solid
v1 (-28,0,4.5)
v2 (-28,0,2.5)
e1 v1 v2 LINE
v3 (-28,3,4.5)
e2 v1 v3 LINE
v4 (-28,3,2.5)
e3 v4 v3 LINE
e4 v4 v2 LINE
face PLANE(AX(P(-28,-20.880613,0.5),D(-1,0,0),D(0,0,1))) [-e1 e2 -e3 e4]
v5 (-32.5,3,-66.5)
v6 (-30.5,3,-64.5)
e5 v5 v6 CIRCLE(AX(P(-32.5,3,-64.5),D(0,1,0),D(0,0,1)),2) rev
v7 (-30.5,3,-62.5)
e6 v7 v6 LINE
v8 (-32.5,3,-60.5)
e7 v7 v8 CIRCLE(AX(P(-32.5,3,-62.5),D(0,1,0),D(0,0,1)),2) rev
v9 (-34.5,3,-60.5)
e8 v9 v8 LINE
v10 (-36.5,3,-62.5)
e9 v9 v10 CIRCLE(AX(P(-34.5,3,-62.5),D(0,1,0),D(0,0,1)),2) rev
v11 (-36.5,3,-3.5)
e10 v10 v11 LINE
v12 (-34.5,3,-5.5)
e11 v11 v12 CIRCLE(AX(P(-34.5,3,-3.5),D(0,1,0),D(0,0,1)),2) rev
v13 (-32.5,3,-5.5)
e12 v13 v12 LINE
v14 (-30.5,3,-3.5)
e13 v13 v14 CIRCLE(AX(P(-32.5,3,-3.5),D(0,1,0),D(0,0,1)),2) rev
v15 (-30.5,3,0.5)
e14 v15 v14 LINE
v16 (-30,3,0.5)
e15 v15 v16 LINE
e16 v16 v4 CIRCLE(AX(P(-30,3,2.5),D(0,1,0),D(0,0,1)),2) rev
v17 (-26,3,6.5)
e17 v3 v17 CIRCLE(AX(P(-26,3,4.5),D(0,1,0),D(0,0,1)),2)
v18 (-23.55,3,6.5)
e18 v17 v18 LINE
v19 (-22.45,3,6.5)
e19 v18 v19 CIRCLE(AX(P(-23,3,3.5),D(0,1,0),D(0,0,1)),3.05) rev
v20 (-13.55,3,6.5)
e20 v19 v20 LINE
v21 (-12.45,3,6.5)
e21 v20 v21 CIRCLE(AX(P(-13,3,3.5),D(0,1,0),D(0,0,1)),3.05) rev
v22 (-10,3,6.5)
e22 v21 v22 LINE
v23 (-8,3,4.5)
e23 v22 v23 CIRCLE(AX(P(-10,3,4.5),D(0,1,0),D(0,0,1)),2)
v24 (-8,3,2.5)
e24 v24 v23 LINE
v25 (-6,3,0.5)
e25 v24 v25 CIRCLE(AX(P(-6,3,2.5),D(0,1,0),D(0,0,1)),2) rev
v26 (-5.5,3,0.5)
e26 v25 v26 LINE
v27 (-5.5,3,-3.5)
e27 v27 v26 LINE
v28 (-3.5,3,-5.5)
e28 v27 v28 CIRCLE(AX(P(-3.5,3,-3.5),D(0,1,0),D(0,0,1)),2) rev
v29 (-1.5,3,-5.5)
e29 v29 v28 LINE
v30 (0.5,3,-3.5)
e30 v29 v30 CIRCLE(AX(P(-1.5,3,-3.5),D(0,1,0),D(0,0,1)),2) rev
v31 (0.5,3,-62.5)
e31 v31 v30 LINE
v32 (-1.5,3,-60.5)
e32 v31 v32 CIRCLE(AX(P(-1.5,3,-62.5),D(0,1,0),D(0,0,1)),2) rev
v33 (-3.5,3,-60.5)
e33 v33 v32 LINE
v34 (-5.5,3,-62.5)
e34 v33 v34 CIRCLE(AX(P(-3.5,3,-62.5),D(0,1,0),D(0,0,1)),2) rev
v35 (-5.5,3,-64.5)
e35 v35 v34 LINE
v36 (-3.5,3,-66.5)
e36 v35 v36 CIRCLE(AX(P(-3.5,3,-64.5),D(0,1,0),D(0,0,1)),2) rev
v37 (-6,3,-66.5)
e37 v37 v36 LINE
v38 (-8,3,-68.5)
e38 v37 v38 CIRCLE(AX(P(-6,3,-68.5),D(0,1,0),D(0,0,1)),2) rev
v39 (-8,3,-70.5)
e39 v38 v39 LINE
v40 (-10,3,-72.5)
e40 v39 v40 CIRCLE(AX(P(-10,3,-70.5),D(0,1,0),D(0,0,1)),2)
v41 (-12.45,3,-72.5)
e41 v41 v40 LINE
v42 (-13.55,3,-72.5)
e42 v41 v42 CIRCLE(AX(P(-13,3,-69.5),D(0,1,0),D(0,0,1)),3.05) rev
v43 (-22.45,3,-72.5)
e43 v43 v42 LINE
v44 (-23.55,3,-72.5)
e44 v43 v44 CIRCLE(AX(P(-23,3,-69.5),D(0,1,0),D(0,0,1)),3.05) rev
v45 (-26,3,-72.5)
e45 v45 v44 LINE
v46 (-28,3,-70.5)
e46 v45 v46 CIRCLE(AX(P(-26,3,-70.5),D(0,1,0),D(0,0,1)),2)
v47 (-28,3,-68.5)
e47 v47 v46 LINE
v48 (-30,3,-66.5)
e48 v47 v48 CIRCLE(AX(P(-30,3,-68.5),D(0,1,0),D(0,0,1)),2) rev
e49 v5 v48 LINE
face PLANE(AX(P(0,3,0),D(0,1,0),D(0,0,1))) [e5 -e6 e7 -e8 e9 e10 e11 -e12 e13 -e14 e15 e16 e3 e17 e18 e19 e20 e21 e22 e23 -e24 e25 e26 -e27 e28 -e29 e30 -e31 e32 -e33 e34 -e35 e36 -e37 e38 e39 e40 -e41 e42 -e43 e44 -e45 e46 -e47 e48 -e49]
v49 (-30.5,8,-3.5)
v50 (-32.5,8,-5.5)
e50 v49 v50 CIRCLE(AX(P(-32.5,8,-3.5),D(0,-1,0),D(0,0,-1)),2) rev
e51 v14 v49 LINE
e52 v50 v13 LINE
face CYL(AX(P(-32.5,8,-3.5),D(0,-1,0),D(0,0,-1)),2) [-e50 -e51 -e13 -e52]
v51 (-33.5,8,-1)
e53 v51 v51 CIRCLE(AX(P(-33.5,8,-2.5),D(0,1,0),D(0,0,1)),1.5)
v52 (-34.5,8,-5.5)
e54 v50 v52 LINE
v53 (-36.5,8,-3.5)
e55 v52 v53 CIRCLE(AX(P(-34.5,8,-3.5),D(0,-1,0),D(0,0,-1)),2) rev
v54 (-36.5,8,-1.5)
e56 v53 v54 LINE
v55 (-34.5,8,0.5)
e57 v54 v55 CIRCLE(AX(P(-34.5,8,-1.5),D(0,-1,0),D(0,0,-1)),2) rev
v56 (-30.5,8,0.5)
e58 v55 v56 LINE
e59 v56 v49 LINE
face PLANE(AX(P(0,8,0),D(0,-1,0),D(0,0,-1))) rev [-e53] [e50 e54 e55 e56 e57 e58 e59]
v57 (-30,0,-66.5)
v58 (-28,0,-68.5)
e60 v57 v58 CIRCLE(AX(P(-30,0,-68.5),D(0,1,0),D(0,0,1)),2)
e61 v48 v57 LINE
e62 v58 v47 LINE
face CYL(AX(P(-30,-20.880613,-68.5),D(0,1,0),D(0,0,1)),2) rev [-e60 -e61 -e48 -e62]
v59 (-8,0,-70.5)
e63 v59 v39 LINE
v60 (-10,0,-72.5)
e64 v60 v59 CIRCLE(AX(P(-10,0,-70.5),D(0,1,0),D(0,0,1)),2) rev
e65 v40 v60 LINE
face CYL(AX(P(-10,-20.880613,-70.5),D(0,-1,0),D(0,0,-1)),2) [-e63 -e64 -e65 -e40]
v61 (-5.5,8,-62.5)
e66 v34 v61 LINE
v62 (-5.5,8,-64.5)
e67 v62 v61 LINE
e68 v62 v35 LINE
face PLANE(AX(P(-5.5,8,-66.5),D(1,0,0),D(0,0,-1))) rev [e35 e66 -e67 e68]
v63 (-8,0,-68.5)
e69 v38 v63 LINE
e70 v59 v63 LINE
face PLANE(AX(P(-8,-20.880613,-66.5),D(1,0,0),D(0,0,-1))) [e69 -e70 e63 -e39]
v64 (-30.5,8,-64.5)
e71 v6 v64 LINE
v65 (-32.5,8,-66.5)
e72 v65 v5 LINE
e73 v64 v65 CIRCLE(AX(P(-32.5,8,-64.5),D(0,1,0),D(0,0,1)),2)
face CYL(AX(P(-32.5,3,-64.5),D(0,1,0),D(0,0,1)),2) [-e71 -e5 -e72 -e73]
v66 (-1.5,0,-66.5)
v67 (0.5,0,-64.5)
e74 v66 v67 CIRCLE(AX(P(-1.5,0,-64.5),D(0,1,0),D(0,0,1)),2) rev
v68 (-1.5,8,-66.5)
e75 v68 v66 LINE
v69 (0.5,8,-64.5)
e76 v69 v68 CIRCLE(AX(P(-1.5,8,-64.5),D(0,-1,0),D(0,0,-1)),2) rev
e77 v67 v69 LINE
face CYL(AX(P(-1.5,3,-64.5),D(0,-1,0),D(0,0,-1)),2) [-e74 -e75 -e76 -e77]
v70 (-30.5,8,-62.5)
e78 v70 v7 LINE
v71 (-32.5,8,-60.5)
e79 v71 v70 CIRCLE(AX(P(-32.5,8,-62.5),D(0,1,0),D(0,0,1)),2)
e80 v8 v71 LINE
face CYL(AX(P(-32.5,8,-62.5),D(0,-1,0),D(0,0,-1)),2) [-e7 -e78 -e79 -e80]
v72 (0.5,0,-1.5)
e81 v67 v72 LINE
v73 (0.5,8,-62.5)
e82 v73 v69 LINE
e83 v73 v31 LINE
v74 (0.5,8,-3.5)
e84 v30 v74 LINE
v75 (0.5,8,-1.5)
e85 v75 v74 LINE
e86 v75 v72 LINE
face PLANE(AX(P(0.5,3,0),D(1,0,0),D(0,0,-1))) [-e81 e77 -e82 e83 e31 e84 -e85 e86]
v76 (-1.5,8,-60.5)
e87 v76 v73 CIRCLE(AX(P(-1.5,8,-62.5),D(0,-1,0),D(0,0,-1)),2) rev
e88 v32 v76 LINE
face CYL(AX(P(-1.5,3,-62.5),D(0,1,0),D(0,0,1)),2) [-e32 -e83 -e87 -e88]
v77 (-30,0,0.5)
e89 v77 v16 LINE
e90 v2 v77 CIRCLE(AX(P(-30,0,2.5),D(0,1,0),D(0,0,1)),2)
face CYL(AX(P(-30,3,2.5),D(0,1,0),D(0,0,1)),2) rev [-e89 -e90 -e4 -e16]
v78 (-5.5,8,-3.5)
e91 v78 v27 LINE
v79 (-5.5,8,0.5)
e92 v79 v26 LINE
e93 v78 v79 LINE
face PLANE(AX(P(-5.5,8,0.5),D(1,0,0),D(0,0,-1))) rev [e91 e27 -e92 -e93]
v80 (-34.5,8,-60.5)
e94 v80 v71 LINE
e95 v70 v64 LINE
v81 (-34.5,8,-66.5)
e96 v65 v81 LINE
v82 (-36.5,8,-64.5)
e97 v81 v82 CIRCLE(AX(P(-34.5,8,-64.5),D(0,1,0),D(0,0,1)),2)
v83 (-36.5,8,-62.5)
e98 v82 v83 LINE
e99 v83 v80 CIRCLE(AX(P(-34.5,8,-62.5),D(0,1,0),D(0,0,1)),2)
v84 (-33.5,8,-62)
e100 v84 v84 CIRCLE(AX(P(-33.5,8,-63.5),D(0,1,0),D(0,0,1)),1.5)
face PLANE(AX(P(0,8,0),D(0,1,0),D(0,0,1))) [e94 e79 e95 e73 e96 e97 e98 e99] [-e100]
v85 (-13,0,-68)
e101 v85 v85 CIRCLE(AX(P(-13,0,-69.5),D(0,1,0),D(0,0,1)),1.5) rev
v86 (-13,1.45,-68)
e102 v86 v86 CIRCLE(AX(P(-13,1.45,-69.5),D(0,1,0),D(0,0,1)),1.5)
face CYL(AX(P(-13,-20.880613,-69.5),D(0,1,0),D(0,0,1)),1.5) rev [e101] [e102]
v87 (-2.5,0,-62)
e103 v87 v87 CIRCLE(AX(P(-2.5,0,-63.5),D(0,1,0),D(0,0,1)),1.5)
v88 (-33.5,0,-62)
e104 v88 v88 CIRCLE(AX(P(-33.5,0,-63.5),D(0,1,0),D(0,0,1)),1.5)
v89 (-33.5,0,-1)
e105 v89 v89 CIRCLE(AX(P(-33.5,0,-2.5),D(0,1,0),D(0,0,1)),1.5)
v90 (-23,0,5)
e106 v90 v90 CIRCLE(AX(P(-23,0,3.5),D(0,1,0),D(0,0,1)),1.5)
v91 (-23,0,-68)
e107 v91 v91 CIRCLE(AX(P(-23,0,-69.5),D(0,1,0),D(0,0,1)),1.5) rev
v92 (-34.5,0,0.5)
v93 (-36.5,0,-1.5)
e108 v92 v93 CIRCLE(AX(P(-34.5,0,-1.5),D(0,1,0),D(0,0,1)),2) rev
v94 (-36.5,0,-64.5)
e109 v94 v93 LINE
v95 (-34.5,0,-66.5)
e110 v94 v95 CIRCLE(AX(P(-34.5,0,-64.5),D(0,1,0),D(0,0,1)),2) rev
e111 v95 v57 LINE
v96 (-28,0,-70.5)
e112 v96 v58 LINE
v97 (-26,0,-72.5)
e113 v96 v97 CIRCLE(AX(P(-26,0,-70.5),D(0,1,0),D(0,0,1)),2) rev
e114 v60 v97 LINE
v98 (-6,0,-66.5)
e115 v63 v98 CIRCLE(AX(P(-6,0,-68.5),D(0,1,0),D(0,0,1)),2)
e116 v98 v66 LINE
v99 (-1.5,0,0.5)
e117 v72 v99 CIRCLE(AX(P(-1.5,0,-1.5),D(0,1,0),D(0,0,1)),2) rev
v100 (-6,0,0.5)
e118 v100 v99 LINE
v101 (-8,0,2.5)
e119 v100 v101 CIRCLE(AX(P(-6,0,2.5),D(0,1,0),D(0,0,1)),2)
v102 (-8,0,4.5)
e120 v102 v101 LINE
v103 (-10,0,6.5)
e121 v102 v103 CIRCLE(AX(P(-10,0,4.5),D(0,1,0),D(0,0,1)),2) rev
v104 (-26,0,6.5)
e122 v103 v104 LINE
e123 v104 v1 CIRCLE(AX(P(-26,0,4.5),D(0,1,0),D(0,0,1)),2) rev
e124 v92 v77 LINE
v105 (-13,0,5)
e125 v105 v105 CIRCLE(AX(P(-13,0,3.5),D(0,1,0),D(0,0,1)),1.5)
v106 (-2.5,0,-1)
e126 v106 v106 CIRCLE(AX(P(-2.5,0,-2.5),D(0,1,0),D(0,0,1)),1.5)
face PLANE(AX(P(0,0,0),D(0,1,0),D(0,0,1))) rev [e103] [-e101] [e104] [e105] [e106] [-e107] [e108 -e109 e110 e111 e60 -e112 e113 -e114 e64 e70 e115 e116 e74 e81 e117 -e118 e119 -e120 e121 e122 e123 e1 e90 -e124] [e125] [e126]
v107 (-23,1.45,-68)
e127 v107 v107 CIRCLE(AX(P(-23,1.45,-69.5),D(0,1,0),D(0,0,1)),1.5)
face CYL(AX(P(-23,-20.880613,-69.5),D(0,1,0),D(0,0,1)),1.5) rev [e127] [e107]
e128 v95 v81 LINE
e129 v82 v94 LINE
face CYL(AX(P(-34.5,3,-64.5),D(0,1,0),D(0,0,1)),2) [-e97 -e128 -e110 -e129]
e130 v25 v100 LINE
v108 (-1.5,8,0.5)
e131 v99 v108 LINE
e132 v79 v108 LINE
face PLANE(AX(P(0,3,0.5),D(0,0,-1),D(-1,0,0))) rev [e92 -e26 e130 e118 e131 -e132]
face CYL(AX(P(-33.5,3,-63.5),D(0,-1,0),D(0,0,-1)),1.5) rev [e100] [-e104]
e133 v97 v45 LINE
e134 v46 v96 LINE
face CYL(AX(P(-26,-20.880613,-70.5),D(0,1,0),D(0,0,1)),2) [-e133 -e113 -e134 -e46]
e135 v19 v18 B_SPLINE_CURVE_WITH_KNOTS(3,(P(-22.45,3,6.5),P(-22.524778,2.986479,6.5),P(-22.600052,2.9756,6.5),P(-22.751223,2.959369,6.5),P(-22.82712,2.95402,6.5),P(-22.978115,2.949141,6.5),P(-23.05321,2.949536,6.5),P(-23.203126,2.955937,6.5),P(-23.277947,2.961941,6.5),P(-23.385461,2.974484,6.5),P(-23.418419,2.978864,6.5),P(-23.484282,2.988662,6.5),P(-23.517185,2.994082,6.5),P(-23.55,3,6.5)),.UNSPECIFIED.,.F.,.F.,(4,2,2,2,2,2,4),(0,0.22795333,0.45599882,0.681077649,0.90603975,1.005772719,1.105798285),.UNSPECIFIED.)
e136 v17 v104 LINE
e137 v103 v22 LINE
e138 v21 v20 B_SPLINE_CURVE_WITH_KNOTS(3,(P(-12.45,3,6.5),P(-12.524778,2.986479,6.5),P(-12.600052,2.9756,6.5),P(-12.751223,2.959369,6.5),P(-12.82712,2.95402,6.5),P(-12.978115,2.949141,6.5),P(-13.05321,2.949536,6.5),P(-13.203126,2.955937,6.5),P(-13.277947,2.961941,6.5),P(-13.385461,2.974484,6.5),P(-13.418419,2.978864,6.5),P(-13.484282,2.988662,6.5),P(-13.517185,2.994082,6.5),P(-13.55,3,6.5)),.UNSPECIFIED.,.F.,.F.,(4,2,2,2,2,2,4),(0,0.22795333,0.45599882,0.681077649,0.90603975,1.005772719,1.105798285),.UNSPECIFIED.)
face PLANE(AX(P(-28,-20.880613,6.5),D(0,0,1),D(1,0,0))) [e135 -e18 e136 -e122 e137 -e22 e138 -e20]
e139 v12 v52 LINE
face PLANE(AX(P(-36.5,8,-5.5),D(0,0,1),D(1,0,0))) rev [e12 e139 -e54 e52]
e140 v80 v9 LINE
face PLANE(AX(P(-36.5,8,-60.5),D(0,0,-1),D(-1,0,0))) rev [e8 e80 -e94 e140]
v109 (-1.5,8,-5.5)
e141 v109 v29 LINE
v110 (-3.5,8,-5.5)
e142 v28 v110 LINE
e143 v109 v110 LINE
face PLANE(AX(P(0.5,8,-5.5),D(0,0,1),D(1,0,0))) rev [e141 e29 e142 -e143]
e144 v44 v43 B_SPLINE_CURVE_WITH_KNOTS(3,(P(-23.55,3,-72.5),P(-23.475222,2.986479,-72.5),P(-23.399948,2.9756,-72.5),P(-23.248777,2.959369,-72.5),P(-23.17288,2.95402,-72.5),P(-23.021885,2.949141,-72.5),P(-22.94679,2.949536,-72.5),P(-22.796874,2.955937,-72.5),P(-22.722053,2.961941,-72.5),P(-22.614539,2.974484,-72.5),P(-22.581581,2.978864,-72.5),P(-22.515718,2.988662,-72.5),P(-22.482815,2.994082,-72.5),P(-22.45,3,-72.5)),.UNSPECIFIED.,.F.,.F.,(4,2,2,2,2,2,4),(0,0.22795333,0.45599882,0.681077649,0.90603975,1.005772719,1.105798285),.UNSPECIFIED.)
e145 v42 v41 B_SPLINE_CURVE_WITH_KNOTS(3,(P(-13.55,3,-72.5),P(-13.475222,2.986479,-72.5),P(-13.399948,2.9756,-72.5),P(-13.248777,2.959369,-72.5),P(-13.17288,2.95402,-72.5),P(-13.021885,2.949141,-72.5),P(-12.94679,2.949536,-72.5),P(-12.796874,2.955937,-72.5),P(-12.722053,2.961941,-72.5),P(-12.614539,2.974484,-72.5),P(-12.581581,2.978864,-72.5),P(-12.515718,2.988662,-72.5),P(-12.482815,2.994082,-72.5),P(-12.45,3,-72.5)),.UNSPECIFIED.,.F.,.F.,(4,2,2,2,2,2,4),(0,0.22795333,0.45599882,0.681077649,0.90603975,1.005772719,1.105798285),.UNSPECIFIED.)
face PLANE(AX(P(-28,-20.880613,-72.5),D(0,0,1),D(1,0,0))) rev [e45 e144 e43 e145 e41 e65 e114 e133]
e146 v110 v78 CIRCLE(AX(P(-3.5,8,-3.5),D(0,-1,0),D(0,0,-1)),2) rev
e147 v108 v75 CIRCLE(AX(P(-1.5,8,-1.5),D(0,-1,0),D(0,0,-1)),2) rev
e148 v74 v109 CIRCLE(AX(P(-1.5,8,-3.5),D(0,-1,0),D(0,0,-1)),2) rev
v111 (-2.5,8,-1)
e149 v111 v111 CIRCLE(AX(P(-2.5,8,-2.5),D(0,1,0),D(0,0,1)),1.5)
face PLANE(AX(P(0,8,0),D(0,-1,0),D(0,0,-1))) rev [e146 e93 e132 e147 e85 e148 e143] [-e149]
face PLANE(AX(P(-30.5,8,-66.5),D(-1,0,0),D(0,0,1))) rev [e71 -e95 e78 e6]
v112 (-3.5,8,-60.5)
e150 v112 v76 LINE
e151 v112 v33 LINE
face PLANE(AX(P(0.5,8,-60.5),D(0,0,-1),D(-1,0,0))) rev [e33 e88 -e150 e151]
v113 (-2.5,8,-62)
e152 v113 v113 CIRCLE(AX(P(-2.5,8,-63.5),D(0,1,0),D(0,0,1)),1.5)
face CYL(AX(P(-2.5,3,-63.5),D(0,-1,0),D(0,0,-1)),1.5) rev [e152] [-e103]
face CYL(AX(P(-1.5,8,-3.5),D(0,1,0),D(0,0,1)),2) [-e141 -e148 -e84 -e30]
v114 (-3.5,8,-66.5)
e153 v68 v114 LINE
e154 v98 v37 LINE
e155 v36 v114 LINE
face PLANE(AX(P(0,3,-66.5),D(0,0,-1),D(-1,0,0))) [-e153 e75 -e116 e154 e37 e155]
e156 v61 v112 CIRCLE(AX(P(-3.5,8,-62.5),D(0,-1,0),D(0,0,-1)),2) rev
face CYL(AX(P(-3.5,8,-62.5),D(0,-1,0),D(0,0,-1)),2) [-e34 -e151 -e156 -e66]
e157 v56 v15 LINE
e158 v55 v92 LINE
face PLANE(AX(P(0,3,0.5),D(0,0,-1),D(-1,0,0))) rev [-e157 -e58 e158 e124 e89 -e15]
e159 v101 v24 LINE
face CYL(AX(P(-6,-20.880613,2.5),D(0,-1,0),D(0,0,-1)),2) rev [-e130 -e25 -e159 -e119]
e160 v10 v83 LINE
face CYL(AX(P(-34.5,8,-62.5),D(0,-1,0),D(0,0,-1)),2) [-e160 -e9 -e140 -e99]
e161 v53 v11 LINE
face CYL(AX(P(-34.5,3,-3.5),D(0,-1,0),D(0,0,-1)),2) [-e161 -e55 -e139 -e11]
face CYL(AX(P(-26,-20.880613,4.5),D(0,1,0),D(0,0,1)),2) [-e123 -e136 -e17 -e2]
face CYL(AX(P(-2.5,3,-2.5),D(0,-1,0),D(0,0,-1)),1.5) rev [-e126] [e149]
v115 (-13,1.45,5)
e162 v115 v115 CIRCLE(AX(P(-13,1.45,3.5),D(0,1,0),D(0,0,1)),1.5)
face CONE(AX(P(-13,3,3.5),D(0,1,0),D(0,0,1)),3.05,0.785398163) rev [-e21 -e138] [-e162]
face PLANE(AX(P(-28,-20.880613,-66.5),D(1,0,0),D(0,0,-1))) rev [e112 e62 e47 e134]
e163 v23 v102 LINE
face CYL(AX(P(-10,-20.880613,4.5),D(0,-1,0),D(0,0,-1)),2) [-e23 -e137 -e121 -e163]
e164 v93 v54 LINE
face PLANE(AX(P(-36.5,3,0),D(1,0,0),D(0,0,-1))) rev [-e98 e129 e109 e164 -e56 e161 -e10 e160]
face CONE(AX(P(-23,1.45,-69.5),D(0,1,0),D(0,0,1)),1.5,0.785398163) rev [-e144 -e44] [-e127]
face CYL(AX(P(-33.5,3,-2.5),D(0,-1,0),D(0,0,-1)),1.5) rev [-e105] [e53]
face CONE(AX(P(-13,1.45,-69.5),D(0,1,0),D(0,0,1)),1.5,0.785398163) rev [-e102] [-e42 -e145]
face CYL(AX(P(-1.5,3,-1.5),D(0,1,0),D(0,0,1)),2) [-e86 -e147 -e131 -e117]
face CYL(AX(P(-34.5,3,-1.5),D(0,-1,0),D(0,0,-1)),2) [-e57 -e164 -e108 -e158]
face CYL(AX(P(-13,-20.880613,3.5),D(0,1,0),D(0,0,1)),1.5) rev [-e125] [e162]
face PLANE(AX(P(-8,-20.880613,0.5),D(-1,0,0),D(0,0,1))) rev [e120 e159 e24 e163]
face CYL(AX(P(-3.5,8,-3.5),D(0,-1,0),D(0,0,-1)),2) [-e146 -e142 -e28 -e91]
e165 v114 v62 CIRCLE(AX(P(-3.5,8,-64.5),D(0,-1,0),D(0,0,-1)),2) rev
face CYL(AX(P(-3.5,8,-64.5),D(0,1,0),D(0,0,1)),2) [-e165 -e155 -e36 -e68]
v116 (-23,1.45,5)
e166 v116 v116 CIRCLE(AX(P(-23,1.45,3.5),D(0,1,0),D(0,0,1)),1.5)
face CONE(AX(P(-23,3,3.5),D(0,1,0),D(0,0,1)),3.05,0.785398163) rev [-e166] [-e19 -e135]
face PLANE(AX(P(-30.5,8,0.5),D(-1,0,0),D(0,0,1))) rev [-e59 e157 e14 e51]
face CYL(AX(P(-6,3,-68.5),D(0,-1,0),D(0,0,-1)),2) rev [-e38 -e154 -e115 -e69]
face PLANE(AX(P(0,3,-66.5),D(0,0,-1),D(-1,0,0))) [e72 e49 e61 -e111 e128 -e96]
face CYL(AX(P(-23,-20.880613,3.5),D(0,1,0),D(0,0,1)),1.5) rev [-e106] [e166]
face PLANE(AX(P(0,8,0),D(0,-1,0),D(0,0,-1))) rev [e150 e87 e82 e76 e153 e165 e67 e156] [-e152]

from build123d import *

# Parameters (mm, degrees)
SKETCH1_W           = 37
SKETCH1_H           = 67
SKETCH1_R           = 1.5
BOSS_EXTRUDE1_DEPTH = 3
SKETCH2_W           = 6
SKETCH2_H           = 6
SKETCH2_R           = 1.5
BOSS_EXTRUDE2_DEPTH = 5
FILLET1_R           = 2
SKETCH3_W           = 20
SKETCH3_H           = 6
SKETCH3_R           = 1.5
BOSS_EXTRUDE3_DEPTH = 3
FILLET2_R           = 2
CHAMFER1_SIZE       = 1.55


with BuildPart() as part:
    # Sketch1 → Boss-Extrude1 (new body)
    with BuildSketch(Plane(origin=(0, 0, 0), x_dir=(1, 0, 0), z_dir=(0, 1, 0))):
        with Locations((-18, 33)):
            Rectangle(SKETCH1_W, SKETCH1_H)
        with Locations(Location((-2.5, 63.5, 0), (0, 0, 270))):
            Circle(SKETCH1_R, mode=Mode.SUBTRACT)
        with Locations(Location((-33.5, 63.5, 0), (0, 0, 270))):
            Circle(SKETCH1_R, mode=Mode.SUBTRACT)
        with Locations(Location((-2.5, 2.5, 0), (0, 0, 270))):
            Circle(SKETCH1_R, mode=Mode.SUBTRACT)
        with Locations(Location((-33.5, 2.5, 0), (0, 0, 270))):
            Circle(SKETCH1_R, mode=Mode.SUBTRACT)
    extrude(amount=BOSS_EXTRUDE1_DEPTH)

    # Sketch2 → Boss-Extrude2 (add)
    # profile 1 of 4: a face of its own
    with BuildSketch(Plane(origin=(0, 3, 0), x_dir=(1, 0, 0), z_dir=(0, 1, 0))):
        with Locations((-33.5, 63.5)):
            Rectangle(SKETCH2_W, SKETCH2_H)
        with Locations(Location((-33.5, 63.5, 0), (0, 0, 270))):
            Circle(SKETCH2_R, mode=Mode.SUBTRACT)
    # profile 2 of 4: a face of its own
    with BuildSketch(Plane(origin=(0, 3, 0), x_dir=(1, 0, 0), z_dir=(0, 1, 0))):
        with Locations((-2.5, 63.5)):
            Rectangle(SKETCH2_W, SKETCH2_H)
        with Locations(Location((-2.5, 63.5, 0), (0, 0, 270))):
            Circle(SKETCH2_R, mode=Mode.SUBTRACT)
    # profile 3 of 4: a face of its own
    with BuildSketch(Plane(origin=(0, 3, 0), x_dir=(1, 0, 0), z_dir=(0, 1, 0))):
        with Locations((-2.5, 2.5)):
            Rectangle(SKETCH2_W, SKETCH2_H)
        with Locations(Location((-2.5, 2.5, 0), (0, 0, 270))):
            Circle(SKETCH2_R, mode=Mode.SUBTRACT)
    # profile 4 of 4: a face of its own
    with BuildSketch(Plane(origin=(0, 3, 0), x_dir=(1, 0, 0), z_dir=(0, 1, 0))):
        with Locations((-33.5, 2.5)):
            Rectangle(SKETCH2_W, SKETCH2_H)
        with Locations(Location((-33.5, 2.5, 0), (0, 0, 270))):
            Circle(SKETCH2_R, mode=Mode.SUBTRACT)
    extrude(amount=BOSS_EXTRUDE2_DEPTH)

    # Fillet1
    fillet1_edges = [part.edges().sort_by_distance(p)[0] for p in [
        (0.5, 4, 0.5),
        (-36.5, 4, 0.5),
        (-36.5, 4, -66.5),
        (0.5, 4, -66.5),
        (-36.5, 5.5, -60.5),
        (-30.5, 5.5, -60.5),
        (-30.5, 5.5, -66.5),
        (0.5, 5.5, -60.5),
        (-5.5, 5.5, -66.5),
        (-5.5, 5.5, -60.5),
        (0.5, 5.5, -5.5),
        (-5.5, 5.5, -5.5),
        (-36.5, 5.5, -5.5),
        (-30.5, 5.5, -5.5),
    ]]
    fillet(fillet1_edges, radius=FILLET1_R)

    # Sketch3 → Boss-Extrude3 (add)
    # profile 1 of 2: a face of its own
    with BuildSketch(Plane(origin=(0, 3, 0), x_dir=(1, 0, 0), z_dir=(0, 1, 0))):
        with Locations((-18, 69.5)):
            Rectangle(SKETCH3_W, SKETCH3_H)
        with Locations(Location((-13, 69.5, 0), (0, 0, 270))):
            Circle(SKETCH3_R, mode=Mode.SUBTRACT)
        with Locations(Location((-23, 69.5, 0), (0, 0, 270))):
            Circle(SKETCH3_R, mode=Mode.SUBTRACT)
    # profile 2 of 2: a face of its own
    with BuildSketch(Plane(origin=(0, 3, 0), x_dir=(1, 0, 0), z_dir=(0, 1, 0))):
        with Locations((-18, -3.5)):
            Rectangle(SKETCH3_W, SKETCH3_H)
        with Locations(Location((-23, -3.5, 0), (0, 0, 270))):
            Circle(SKETCH3_R, mode=Mode.SUBTRACT)
        with Locations(Location((-13, -3.5, 0), (0, 0, 270))):
            Circle(SKETCH3_R, mode=Mode.SUBTRACT)
    extrude(amount=-BOSS_EXTRUDE3_DEPTH)

    # Fillet2
    fillet2_edges = [part.edges().sort_by_distance(p)[0] for p in [
        (-28, 1.5, 0.5),
        (-8, 1.5, 0.5),
        (-8, 1.5, 6.5),
        (-28, 1.5, 6.5),
        (-28, 1.5, -66.5),
        (-8, 1.5, -66.5),
        (-8, 1.5, -72.5),
        (-28, 1.5, -72.5),
    ]]
    fillet(fillet2_edges, radius=FILLET2_R)

    # Chamfer1
    # the kernel refuses this chamfer: 1.55 mm, written as the material it takes off along each edge
    with BuildSketch(Plane(origin=(-23, 3, 3.5), x_dir=(0, 0, 1), z_dir=(-1, 0, 0))) as chamfer1_piece_1:
        Polygon((1.5 + CHAMFER1_SIZE, 0), (1.5, -CHAMFER1_SIZE), (1.5, 0), align=None)
    revolve(axis=Axis((-23, 3, 3.5), (0, 1, 0)), mode=Mode.SUBTRACT)
    with BuildSketch(Plane(origin=(-13, 3, 3.5), x_dir=(0, 0, 1), z_dir=(-1, 0, 0))) as chamfer1_piece_2:
        Polygon((1.5 + CHAMFER1_SIZE, 0), (1.5, -CHAMFER1_SIZE), (1.5, 0), align=None)
    revolve(axis=Axis((-13, 3, 3.5), (0, 1, 0)), mode=Mode.SUBTRACT)
    with BuildSketch(Plane(origin=(-23, 3, -69.5), x_dir=(0, 0, 1), z_dir=(-1, 0, 0))) as chamfer1_piece_3:
        Polygon((1.5 + CHAMFER1_SIZE, 0), (1.5, -CHAMFER1_SIZE), (1.5, 0), align=None)
    revolve(axis=Axis((-23, 3, -69.5), (0, 1, 0)), mode=Mode.SUBTRACT)
    with BuildSketch(Plane(origin=(-13, 3, -69.5), x_dir=(0, 0, 1), z_dir=(-1, 0, 0))) as chamfer1_piece_4:
        Polygon((1.5 + CHAMFER1_SIZE, 0), (1.5, -CHAMFER1_SIZE), (1.5, 0), align=None)
    revolve(axis=Axis((-13, 3, -69.5), (0, 1, 0)), mode=Mode.SUBTRACT)


solid = part.part
